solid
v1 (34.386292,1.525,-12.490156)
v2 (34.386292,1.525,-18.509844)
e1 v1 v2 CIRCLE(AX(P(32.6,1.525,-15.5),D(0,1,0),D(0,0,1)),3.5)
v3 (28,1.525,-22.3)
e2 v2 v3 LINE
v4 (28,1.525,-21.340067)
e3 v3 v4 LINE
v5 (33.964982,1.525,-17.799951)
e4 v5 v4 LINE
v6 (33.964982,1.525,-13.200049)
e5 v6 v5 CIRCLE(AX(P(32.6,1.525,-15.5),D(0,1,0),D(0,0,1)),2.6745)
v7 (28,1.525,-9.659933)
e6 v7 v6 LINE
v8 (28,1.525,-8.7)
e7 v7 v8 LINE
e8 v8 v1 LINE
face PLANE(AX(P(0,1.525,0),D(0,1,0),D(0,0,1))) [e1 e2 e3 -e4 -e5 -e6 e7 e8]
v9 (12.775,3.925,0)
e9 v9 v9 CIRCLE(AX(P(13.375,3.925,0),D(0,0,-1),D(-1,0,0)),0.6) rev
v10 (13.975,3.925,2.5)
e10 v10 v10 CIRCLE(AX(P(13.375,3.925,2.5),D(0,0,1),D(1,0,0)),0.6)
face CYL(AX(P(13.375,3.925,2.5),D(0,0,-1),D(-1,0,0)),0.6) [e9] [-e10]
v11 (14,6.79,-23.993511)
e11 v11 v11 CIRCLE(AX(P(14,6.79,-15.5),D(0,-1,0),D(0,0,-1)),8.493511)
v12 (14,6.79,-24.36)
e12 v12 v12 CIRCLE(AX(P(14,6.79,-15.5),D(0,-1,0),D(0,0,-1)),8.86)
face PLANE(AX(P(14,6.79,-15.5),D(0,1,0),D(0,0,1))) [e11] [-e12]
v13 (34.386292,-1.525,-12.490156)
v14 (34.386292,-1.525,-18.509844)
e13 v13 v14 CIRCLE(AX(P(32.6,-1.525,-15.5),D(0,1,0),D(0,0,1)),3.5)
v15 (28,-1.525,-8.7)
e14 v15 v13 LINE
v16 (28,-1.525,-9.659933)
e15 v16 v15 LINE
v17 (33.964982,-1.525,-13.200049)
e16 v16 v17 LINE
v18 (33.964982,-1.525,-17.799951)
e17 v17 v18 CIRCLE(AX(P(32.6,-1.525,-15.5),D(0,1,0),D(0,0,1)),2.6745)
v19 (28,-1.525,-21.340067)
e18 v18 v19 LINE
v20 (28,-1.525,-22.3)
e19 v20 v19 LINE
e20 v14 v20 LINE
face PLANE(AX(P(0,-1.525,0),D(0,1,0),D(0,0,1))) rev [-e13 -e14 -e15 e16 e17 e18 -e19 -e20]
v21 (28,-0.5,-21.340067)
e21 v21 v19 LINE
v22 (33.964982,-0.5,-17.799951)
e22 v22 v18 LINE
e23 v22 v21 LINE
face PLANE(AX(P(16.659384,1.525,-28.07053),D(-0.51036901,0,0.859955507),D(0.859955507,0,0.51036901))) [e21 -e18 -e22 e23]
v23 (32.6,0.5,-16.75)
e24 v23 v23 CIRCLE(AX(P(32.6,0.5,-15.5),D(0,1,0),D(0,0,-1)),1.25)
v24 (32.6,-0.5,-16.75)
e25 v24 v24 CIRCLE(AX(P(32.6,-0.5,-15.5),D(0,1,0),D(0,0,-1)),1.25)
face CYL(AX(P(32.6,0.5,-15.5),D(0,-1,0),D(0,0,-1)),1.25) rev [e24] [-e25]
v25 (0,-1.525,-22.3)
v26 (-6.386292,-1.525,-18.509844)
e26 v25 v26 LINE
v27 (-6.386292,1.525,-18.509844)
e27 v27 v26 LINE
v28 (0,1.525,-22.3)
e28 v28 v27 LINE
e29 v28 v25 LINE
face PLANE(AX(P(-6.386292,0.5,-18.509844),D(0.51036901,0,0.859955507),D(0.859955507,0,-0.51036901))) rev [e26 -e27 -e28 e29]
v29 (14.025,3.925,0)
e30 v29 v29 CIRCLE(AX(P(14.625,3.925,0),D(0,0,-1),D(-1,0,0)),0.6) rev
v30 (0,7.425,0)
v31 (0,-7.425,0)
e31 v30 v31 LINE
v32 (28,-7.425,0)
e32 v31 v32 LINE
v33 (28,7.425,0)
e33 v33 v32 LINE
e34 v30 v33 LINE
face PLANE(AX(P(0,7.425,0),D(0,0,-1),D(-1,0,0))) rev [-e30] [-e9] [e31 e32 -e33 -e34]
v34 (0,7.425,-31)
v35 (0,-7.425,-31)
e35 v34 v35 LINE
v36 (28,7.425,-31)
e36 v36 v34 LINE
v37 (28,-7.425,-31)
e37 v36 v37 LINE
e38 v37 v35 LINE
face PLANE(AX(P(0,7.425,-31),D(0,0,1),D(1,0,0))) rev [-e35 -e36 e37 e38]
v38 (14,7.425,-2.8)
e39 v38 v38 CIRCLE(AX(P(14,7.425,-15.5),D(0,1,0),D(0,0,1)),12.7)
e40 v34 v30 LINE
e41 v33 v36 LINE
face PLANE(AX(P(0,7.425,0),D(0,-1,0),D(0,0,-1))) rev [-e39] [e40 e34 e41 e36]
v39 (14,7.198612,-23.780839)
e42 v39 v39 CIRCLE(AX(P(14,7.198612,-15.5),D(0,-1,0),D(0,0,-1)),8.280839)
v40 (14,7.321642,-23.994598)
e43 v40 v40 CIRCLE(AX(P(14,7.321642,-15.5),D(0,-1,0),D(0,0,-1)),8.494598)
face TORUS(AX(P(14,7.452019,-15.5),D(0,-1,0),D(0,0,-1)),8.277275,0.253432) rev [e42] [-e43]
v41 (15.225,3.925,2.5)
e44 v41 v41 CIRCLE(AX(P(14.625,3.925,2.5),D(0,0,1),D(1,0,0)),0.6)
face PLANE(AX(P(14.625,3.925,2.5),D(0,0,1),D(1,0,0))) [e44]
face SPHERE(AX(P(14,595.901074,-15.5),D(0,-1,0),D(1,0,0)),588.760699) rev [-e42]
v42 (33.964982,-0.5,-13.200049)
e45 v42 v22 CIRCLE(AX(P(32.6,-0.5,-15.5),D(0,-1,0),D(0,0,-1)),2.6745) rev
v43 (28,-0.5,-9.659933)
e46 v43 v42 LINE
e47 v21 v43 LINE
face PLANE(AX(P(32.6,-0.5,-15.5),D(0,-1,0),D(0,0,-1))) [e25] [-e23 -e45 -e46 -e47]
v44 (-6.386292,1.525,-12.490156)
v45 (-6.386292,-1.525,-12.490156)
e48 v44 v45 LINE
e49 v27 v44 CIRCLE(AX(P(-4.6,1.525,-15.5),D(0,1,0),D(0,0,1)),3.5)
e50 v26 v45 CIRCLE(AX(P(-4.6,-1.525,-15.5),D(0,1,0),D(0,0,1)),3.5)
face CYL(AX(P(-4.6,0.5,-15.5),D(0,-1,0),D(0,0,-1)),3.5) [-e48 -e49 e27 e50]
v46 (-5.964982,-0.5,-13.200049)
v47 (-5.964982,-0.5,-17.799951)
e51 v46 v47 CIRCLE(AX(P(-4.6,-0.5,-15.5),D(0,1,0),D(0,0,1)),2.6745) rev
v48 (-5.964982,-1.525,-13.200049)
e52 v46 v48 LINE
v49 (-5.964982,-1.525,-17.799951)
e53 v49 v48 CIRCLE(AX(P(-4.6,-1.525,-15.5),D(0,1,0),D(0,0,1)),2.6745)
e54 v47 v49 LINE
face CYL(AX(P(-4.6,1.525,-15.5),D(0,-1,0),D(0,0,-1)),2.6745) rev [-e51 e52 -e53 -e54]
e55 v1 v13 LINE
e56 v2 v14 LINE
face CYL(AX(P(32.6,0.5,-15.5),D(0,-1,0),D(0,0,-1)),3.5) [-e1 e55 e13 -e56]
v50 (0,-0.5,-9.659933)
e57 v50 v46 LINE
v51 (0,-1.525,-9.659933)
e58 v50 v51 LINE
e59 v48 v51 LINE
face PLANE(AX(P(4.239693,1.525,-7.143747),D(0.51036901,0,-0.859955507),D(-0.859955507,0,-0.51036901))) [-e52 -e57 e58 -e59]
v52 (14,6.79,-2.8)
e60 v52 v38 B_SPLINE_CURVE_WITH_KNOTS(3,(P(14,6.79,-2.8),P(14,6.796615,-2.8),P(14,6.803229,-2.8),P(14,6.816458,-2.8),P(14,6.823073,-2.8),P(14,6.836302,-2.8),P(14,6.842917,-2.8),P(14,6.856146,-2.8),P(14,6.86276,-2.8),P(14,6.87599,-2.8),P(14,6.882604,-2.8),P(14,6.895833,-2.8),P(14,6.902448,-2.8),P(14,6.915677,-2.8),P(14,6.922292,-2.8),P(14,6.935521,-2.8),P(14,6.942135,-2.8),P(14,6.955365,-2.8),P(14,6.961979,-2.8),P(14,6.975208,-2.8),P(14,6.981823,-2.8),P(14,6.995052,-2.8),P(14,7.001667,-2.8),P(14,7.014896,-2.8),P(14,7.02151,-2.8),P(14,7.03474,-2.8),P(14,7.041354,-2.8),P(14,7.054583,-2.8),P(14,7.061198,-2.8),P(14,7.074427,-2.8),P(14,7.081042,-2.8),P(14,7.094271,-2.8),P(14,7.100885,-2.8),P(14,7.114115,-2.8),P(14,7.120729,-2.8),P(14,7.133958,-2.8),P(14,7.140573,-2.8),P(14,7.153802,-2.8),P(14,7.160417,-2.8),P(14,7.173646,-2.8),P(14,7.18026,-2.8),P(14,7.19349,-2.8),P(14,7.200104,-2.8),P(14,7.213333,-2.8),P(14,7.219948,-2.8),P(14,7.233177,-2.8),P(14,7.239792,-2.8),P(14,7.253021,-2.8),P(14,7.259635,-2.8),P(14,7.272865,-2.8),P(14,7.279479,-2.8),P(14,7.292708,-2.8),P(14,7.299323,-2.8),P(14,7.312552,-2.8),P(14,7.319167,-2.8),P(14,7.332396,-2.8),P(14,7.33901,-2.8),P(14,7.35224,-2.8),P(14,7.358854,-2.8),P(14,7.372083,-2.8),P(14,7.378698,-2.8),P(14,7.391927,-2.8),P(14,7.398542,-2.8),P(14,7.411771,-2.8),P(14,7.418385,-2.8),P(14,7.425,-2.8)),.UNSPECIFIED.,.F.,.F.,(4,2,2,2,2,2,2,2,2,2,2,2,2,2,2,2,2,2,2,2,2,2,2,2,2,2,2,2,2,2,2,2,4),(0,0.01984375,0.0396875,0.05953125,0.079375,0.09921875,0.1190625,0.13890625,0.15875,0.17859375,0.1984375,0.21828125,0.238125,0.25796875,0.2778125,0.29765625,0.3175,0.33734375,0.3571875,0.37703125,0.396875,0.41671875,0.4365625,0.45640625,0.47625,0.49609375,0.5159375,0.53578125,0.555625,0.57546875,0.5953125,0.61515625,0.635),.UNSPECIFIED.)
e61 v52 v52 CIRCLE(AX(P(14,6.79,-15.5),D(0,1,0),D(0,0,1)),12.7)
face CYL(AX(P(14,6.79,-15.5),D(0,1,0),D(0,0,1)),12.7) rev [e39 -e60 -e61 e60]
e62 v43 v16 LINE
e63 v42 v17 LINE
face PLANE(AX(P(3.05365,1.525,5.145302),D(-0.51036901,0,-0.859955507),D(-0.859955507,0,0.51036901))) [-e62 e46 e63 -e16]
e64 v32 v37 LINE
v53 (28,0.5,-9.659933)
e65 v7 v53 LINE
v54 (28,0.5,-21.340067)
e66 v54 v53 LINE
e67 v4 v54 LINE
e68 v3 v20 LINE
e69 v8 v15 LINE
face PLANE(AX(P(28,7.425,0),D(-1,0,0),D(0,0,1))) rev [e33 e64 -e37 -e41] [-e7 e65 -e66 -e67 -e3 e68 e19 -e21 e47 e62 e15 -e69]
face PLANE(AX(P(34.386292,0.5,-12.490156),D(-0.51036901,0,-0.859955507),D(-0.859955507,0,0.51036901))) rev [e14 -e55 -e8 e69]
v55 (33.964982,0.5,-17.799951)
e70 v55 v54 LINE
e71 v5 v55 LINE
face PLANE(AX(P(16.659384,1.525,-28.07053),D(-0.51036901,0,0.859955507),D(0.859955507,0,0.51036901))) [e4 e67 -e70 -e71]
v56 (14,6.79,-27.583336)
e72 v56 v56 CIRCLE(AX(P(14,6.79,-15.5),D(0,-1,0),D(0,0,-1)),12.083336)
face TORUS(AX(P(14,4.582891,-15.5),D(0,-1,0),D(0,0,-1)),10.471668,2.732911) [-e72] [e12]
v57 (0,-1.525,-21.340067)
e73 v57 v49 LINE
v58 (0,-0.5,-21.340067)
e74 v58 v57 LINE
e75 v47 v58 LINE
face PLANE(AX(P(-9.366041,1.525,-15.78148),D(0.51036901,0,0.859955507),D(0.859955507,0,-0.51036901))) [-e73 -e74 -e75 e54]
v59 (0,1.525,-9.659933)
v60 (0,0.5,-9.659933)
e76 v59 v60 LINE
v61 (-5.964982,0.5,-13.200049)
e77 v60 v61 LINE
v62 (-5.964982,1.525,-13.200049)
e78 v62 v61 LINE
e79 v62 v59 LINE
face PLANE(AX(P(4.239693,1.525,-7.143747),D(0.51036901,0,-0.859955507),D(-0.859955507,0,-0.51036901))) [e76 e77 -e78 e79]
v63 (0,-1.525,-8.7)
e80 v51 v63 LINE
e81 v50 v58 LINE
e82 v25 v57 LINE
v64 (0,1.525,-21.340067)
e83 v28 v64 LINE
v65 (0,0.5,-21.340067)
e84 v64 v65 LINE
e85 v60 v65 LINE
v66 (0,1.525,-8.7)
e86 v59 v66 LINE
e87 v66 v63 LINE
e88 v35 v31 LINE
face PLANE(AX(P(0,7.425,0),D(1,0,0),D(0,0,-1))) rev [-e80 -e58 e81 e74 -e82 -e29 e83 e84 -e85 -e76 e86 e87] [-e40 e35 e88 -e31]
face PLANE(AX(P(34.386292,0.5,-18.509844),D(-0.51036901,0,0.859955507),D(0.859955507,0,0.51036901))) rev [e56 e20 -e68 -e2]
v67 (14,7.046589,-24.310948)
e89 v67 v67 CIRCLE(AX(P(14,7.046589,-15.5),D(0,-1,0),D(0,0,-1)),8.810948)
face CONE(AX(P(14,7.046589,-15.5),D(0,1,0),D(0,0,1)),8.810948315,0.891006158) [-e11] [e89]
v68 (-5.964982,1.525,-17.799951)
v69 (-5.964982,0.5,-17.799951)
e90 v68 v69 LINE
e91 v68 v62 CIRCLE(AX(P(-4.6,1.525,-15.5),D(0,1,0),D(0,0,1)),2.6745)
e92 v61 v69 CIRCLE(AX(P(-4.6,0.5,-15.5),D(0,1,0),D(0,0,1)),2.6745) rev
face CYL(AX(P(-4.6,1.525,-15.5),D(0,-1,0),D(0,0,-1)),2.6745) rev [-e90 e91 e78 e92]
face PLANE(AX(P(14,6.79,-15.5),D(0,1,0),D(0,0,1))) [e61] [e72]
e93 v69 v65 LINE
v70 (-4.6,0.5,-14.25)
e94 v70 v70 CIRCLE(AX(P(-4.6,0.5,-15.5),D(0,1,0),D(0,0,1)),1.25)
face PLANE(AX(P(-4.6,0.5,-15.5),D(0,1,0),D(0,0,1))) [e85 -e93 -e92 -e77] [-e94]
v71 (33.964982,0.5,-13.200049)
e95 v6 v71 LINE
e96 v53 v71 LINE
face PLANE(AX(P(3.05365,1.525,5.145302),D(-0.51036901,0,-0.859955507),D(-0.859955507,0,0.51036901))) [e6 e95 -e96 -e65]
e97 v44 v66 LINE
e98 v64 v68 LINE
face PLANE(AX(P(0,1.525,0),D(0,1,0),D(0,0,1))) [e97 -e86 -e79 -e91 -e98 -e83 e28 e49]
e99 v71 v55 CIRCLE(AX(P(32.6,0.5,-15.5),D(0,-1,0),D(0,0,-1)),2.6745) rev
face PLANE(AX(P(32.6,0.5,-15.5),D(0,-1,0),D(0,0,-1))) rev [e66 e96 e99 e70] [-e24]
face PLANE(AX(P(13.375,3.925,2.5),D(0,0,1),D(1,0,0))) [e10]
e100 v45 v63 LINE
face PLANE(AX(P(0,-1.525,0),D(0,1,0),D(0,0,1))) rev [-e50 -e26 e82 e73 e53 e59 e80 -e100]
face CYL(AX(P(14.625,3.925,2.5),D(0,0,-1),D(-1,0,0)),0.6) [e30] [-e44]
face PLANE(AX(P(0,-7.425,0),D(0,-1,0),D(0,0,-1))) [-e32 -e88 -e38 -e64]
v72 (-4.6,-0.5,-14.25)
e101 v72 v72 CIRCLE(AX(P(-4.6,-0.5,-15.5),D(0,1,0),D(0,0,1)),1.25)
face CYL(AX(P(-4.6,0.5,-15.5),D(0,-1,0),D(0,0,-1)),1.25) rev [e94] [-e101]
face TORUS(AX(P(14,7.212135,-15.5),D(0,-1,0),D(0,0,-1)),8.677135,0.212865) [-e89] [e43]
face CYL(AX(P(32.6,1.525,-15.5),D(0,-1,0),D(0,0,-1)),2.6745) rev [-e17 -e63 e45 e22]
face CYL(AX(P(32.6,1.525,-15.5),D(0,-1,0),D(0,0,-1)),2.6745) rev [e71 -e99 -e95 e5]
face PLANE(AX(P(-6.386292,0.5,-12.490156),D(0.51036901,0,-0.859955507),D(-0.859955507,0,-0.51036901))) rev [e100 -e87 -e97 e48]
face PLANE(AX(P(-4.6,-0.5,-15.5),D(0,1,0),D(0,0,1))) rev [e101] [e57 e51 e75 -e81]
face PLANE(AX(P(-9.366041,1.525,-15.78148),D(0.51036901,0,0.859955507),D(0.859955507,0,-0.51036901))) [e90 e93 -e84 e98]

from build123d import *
from build123d.topology import SkipClean

# Parameters (mm, degrees)
SKETCH1_W           = 28
SKETCH1_H           = 31
BOSS_EXTRUDE1_DEPTH = 7.425
SKETCH2_R           = 1.25
BOSS_EXTRUDE2_DEPTH = 0.5
BOSS_EXTRUDE3_DEPTH = 1.525
SKETCH3_R           = 12.7
CUT_EXTRUDE1_DEPTH  = 0.635
SKETCH7_R           = 0.6
BOSS_EXTRUDE6_DEPTH = 2.5


with BuildPart() as part:
    # Sketch1 → Boss-Extrude1 (new, symmetric)
    with BuildSketch(Plane(origin=(0, 0, 0), x_dir=(1, 0, 0), z_dir=(0, 1, 0))):
        with Locations((14, 15.5)):
            Rectangle(SKETCH1_W, SKETCH1_H)
    extrude(amount=BOSS_EXTRUDE1_DEPTH, both=True)

    # Sketch2 → Boss-Extrude2 (add, symmetric)
    # profile 1 of 2: a face of its own
    with BuildSketch(Plane(origin=(0, 0, 0), x_dir=(1, 0, 0), z_dir=(0, 1, 0))):
        with BuildLine():
            Line((0, 8.7), (0, 22.3))
            Line((0, 22.3), (-6.386291535, 18.509844274))
            ThreePointArc((-6.386291535, 18.509844274), (-8.1, 15.5), (-6.386291535, 12.490155726))
            Line((-6.386291535, 12.490155726), (0, 8.7))
        make_face()
        with Locations((-4.6, 15.5)):
            Circle(SKETCH2_R, mode=Mode.SUBTRACT)
    # profile 2 of 2: a face of its own
    with BuildSketch(Plane(origin=(0, 0, 0), x_dir=(1, 0, 0), z_dir=(0, 1, 0))):
        with BuildLine():
            Line((34.386291535, 12.490155726), (28, 8.7))
            Line((28, 8.7), (28, 22.3))
            Line((28, 22.3), (34.386291535, 18.509844274))
            ThreePointArc((34.386291535, 18.509844274), (36.1, 15.5), (34.386291535, 12.490155726))
        make_face()
        with Locations((32.6, 15.5)):
            Circle(SKETCH2_R, mode=Mode.SUBTRACT)
    extrude(amount=BOSS_EXTRUDE2_DEPTH, both=True)

    # Sketch5 → Boss-Extrude3 (add, symmetric)
    with SkipClean():  # the faces are left unmerged after this step: merging them gives an invalid solid
        with BuildSketch(Plane(origin=(0, 0, 0), x_dir=(1, 0, 0), z_dir=(0, 1, 0))):
            with BuildLine():
                ThreePointArc((-6.386291535, 18.509844274), (-8.1, 15.5), (-6.386291535, 12.490155726))
                Line((-6.386291535, 12.490155726), (0, 8.7))
                Line((0, 8.7), (0, 9.659933384))
                Line((0, 9.659933384), (-5.964981917, 13.200048997))
                ThreePointArc((-5.964981917, 13.200048997), (-7.2745, 15.5), (-5.964981917, 17.799951003))
                Line((-5.964981917, 17.799951003), (0, 21.340066616))
                Line((0, 21.340066616), (0, 22.3))
                Line((0, 22.3), (-6.386291535, 18.509844274))
            make_face()
            with BuildLine():
                ThreePointArc((34.386291535, 12.490155726), (36.1, 15.5), (34.386291535, 18.509844274))
                Line((34.386291535, 18.509844274), (28, 22.3))
                Line((28, 22.3), (28, 21.340066616))
                Line((28, 21.340066616), (33.964981917, 17.799951003))
                ThreePointArc((33.964981917, 17.799951003), (35.2745, 15.5), (33.964981917, 13.200048997))
                Line((33.964981917, 13.200048997), (28, 9.659933384))
                Line((28, 9.659933384), (28, 8.7))
                Line((28, 8.7), (34.386291535, 12.490155726))
            make_face()
        extrude(amount=BOSS_EXTRUDE3_DEPTH, both=True)
    add(part.part.scale(1), mode=Mode.REPLACE)  # the faces are merged on a copy

    # Sketch3 → Cut-Extrude1 (cut)
    with BuildSketch(Plane(origin=(0, 7.425, 0), x_dir=(1, 0, 0), z_dir=(0, 1, 0))):
        with Locations((14, 15.5)):
            Circle(SKETCH3_R)
    extrude(amount=-CUT_EXTRUDE1_DEPTH, mode=Mode.SUBTRACT)

    # Sketch6 → Revolve1 (revolve)
    with BuildSketch(Plane(origin=(0, 0, -15.5), x_dir=(-1, 0, 0), z_dir=(0, 0, -1))):
        with BuildLine():
            Line((-22.493511176, 6.79), (-22.810948315, 7.046589007))
            ThreePointArc((-22.810948315, 7.046589007), (-22.816802833, 7.372772527), (-22.494598431, 7.321642421))
            ThreePointArc((-22.494598431, 7.321642421), (-22.403694623, 7.232370162), (-22.280839201, 7.198612444))
            ThreePointArc((-22.280839201, 7.198612444), (-18.140521992, 7.154934635), (-14, 7.140375125))
            Line((-14, 7.140375125), (-14, 6.79))
            Line((-14, 6.79), (-22.493511176, 6.79))
        make_face()
        with BuildLine():
            Line((-26.083336466, 6.79), (-22.86, 6.79))
            ThreePointArc((-22.86, 6.79), (-24.471668233, 7.315802401), (-26.083336466, 6.79))
        make_face()
    revolve(axis=Axis((14, -7.425, -15.5), (0, 1, 0)))

    # Sketch7 → Boss-Extrude6 (add)
    with BuildSketch(Plane.XY):
        with Locations((14.625, 3.925)):
            Circle(SKETCH7_R)
        with Locations((13.375, 3.925)):
            Circle(SKETCH7_R)
    extrude(amount=BOSS_EXTRUDE6_DEPTH)


solid = part.part
